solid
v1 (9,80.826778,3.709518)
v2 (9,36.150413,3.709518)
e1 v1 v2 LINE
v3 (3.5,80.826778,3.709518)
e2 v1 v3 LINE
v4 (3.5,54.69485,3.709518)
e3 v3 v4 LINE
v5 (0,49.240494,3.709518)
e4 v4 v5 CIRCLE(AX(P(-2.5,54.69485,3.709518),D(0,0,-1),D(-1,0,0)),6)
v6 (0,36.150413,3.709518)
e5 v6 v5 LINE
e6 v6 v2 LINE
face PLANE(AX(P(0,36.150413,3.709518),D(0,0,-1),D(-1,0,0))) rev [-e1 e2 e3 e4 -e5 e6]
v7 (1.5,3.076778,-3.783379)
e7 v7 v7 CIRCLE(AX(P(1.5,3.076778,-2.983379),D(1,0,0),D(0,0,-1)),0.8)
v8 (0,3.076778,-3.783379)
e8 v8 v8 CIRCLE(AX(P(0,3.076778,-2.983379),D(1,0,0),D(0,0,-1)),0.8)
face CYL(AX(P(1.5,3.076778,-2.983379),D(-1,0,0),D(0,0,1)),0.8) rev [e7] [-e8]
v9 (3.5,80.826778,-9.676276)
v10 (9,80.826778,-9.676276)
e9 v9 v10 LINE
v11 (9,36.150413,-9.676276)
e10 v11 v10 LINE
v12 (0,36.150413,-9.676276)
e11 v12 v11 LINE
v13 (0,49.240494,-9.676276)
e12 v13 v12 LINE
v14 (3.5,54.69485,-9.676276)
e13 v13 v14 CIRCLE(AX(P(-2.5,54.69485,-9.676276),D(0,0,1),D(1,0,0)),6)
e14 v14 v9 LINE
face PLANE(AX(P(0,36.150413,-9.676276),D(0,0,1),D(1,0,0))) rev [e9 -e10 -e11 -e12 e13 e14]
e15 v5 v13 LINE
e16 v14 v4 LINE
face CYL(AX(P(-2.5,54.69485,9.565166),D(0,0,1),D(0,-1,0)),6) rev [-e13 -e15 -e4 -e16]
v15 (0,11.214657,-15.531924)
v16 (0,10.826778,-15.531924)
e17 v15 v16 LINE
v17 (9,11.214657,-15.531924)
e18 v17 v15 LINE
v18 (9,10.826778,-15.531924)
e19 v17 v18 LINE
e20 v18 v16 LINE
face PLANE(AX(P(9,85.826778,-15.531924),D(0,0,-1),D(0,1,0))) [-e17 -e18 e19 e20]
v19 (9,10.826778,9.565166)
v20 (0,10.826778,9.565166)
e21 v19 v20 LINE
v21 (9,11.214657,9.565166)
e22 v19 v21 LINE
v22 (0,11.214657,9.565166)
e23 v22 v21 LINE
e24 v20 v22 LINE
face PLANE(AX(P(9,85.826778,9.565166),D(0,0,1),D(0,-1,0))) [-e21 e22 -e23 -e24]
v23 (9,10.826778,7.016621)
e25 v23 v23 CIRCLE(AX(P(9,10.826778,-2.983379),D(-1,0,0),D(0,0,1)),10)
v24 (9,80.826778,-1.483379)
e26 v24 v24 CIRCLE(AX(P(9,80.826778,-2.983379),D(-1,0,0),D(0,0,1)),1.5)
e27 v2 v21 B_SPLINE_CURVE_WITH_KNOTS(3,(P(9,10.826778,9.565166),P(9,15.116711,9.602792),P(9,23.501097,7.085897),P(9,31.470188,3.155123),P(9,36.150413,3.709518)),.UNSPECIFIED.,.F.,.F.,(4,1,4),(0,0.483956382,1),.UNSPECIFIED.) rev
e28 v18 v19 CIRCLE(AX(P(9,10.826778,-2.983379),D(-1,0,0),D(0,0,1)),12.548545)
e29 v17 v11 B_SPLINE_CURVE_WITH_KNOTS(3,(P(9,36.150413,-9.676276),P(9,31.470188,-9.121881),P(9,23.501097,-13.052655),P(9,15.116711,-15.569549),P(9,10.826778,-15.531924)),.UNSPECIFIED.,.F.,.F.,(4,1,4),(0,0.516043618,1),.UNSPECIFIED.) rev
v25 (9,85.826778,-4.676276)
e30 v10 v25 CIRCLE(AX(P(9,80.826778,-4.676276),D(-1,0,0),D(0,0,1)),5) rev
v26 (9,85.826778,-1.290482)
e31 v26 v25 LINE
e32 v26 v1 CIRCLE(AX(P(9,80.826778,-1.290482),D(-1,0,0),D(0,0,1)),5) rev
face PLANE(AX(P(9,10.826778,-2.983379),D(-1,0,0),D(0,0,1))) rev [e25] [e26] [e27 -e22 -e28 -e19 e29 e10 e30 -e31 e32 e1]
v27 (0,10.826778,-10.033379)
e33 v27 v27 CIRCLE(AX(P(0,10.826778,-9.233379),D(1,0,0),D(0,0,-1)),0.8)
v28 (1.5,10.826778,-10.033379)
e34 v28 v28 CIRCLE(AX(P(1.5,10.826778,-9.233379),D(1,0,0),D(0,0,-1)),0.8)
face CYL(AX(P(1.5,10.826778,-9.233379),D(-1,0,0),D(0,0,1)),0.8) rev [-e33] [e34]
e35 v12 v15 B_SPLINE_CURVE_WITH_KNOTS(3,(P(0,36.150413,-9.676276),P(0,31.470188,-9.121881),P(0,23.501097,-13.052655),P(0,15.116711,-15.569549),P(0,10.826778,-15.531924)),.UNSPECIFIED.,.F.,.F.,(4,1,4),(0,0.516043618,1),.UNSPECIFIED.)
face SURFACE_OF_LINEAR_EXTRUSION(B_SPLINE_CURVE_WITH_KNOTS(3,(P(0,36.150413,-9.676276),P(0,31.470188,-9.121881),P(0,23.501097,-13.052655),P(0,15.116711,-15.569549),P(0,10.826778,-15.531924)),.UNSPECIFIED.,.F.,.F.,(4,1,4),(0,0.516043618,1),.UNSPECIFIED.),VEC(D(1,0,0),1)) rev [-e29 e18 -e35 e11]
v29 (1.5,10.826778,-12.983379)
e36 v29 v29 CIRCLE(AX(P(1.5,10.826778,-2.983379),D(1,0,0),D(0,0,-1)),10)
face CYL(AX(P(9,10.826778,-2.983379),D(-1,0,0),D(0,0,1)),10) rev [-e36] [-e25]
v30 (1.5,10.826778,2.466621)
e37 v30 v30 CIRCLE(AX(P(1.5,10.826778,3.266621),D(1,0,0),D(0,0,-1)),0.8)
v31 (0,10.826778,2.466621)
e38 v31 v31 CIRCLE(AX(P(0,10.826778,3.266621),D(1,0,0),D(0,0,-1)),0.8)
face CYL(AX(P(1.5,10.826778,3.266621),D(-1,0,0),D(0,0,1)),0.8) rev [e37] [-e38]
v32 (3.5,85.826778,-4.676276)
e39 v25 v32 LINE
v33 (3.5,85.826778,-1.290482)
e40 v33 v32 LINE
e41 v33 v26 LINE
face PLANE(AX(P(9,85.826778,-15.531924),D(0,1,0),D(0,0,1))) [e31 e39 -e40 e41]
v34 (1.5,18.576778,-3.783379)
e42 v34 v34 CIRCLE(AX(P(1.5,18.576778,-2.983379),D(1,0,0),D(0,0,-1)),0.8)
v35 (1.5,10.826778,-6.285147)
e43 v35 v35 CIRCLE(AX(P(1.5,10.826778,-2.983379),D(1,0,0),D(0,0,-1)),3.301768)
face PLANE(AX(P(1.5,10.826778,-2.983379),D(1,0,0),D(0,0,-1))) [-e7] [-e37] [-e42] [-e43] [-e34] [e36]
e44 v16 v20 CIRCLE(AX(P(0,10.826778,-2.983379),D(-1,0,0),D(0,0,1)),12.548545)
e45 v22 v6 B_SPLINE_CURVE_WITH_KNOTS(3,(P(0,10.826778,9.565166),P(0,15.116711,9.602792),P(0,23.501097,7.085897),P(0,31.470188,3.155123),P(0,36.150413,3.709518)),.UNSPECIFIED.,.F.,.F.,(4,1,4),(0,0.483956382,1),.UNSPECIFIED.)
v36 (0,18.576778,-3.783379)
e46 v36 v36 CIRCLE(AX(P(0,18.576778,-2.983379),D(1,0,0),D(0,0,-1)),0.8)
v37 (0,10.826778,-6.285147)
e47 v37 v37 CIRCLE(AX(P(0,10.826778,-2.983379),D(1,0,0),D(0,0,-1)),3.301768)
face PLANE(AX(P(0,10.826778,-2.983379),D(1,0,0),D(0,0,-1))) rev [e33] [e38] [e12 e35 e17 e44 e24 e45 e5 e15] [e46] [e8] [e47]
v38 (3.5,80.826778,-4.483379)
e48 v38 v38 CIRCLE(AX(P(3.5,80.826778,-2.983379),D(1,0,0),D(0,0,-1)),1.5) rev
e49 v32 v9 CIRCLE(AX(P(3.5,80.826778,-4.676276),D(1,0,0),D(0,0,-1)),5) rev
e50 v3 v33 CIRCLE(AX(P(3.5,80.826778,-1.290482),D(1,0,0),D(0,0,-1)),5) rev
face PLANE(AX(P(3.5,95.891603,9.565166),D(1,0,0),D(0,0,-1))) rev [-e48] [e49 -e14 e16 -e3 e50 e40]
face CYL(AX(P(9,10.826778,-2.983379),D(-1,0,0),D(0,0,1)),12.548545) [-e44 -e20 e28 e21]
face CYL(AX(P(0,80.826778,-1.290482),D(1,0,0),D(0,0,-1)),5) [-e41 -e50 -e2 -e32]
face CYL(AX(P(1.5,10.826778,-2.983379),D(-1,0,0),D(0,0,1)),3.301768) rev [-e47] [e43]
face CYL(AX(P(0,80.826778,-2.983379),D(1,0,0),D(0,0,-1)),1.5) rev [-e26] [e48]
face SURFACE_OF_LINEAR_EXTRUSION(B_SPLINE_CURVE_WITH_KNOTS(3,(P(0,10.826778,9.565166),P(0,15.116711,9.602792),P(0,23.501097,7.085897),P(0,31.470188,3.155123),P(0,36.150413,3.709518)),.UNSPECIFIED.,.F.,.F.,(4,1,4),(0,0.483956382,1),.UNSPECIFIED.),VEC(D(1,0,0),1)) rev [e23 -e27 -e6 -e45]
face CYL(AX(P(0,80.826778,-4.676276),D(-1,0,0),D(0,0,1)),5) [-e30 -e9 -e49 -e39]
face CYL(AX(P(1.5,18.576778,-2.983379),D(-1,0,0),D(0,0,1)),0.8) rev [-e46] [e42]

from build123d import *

# Parameters (mm, degrees)
SKETCH1_R               = 10
SKETCH1_R_2             = 0.8
SKETCH1_R_3             = 3.301767793
BOSS_EXTRUDE1_DEPTH     = 1.5
SKETCH2_R               = 10
BOSS_EXTRUDE2_DEPTH     = 9
CUT_EXTRUDE1_DEPTH      = 88.683957995
CUT_EXTRUDE1_DEPTH_BACK = 88.683957995
SKETCH3_R               = 1.5
FILLET1_R               = 5
CUT_EXTRUDE2_DEPTH      = 89.416451723
CUT_EXTRUDE2_DEPTH_BACK = 89.416451723
SKETCH4_W               = 11.042772081
SKETCH4_H               = 46.651109912
FILLET3_R               = 6


with BuildPart() as part:
    # Sketch1 → Boss-Extrude1 (new body)
    with BuildSketch(Plane(origin=(0, 0, 0), x_dir=(0, 0, -1), z_dir=(1, 0, 0))):
        with Locations((2.983378847, 10.826778074)):
            Circle(SKETCH1_R)
        with Locations((2.983378847, 18.576778074)):
            Circle(SKETCH1_R_2, mode=Mode.SUBTRACT)
        with Locations((2.983378847, 3.076778074)):
            Circle(SKETCH1_R_2, mode=Mode.SUBTRACT)
        with Locations((-3.266621153, 10.826778074)):
            Circle(SKETCH1_R_2, mode=Mode.SUBTRACT)
        with Locations((9.233378847, 10.826778074)):
            Circle(SKETCH1_R_2, mode=Mode.SUBTRACT)
        with Locations((2.983378847, 10.826778074)):
            Circle(SKETCH1_R_3, mode=Mode.SUBTRACT)
    extrude(amount=BOSS_EXTRUDE1_DEPTH)

    # Sketch2 → Boss-Extrude2 (add)
    with BuildSketch(Plane.ZY):
        with BuildLine():
            Line((-15.531923741, 85.826778074), (9.565166047, 85.826778074))
            Line((9.565166047, 85.826778074), (9.565166047, 10.826778074))
            ThreePointArc((9.565166047, 10.826778074), (-2.983378847, -1.721766821), (-15.531923741, 10.826778074))
            Line((-15.531923741, 10.826778074), (-15.531923741, 85.826778074))
        make_face()
        with Locations((-2.983378847, 10.826778074)):
            Circle(SKETCH2_R, mode=Mode.SUBTRACT)
    extrude(amount=-BOSS_EXTRUDE2_DEPTH)

    # Sketch3 → Cut-Extrude1 (cut, two sides: drawn at the far end of the back side and taken through both)
    with BuildSketch(Plane(origin=(9, 0, 0), x_dir=(0, 0, -1), z_dir=(1, 0, 0)).offset(-CUT_EXTRUDE1_DEPTH_BACK)):
        with Locations((2.983378847, 80.826778074)):
            Circle(SKETCH3_R)
        with BuildLine():
            Line((-3.709517939, 36.150412664), (-3.709517939, 97.572569437))
            Line((-3.709517939, 97.572569437), (-16.389018159, 97.572569437))
            Line((-16.389018159, 97.572569437), (-16.389018159, 8.14109285))
            Line((-16.389018159, 8.14109285), (-9.565166047, 10.826778074))
            add(Edge.make_bspline(
                [(-9.565166047, 10.826778074), (-9.602791773, 15.116710976), (-7.085897165, 23.501097028), (-3.155123098, 31.470187844), (-3.709517939, 36.150412664)],
                knots=[0, 0, 0, 0, 0.483956382, 1, 1, 1, 1], degree=3))
        make_face()
        with BuildLine():
            Line((22.355775853, 8.14109285), (15.531923741, 10.826778074))
            add(Edge.make_bspline(
                [(15.531923741, 10.826778074), (15.569549467, 15.116710976), (13.052654859, 23.501097028), (9.121880792, 31.470187844), (9.676275633, 36.150412664)],
                knots=[0, 0, 0, 0, 0.483956382, 1, 1, 1, 1], degree=3))
            Line((9.676275633, 36.150412664), (9.676275633, 97.572569437))
            Line((9.676275633, 97.572569437), (22.355775853, 97.572569437))
            Line((22.355775853, 97.572569437), (22.355775853, 8.14109285))
        make_face()
    extrude(amount=CUT_EXTRUDE1_DEPTH + CUT_EXTRUDE1_DEPTH_BACK, mode=Mode.SUBTRACT)

    # Fillet1
    fillet1_edges = [part.edges().sort_by_distance(p)[0] for p in [
        (4.5, 85.826778074, 3.709517939),
        (4.5, 85.826778074, -9.676275633),
    ]]
    fillet(fillet1_edges, radius=FILLET1_R)

    # Sketch4 → Cut-Extrude2 (cut, two sides: drawn at the far end of the back side and taken through both)
    with BuildSketch(Plane(origin=(0, 0, -9.676275633), x_dir=(-1, 0, 0), z_dir=(0, 0, -1)).offset(-CUT_EXTRUDE2_DEPTH_BACK)):
        with Locations((2.021386041, 72.566048538)):
            Rectangle(SKETCH4_W, SKETCH4_H)
    extrude(amount=CUT_EXTRUDE2_DEPTH + CUT_EXTRUDE2_DEPTH_BACK, mode=Mode.SUBTRACT)

    # Fillet3
    # the kernel refuses this fillet: 6 mm, written as the material it adds along each edge
    with BuildSketch(Plane(origin=(3.5, 49.240493582, 3.709517939), x_dir=(-1, 0, 0), z_dir=(0, 0, -1))) as fillet3_piece_1:
        with BuildLine():
            CenterArc((6, 5.454356057), FILLET3_R, 180, 65.375681648)
            Line((0, 5.454356057), (-0.12, 5.454356057))
            Line((-0.12, 5.454356057), (-0.12, 0))
            Line((-0.12, 0), (0, -0.12))
            ThreePointArc((0, -0.12), (1.75, -0.12), (3.45, -0.109087121))
            Line((3.45, -0.109087121), (3.5, 0))
        make_face()
    extrude(amount=13.385793571)


solid = part.part
